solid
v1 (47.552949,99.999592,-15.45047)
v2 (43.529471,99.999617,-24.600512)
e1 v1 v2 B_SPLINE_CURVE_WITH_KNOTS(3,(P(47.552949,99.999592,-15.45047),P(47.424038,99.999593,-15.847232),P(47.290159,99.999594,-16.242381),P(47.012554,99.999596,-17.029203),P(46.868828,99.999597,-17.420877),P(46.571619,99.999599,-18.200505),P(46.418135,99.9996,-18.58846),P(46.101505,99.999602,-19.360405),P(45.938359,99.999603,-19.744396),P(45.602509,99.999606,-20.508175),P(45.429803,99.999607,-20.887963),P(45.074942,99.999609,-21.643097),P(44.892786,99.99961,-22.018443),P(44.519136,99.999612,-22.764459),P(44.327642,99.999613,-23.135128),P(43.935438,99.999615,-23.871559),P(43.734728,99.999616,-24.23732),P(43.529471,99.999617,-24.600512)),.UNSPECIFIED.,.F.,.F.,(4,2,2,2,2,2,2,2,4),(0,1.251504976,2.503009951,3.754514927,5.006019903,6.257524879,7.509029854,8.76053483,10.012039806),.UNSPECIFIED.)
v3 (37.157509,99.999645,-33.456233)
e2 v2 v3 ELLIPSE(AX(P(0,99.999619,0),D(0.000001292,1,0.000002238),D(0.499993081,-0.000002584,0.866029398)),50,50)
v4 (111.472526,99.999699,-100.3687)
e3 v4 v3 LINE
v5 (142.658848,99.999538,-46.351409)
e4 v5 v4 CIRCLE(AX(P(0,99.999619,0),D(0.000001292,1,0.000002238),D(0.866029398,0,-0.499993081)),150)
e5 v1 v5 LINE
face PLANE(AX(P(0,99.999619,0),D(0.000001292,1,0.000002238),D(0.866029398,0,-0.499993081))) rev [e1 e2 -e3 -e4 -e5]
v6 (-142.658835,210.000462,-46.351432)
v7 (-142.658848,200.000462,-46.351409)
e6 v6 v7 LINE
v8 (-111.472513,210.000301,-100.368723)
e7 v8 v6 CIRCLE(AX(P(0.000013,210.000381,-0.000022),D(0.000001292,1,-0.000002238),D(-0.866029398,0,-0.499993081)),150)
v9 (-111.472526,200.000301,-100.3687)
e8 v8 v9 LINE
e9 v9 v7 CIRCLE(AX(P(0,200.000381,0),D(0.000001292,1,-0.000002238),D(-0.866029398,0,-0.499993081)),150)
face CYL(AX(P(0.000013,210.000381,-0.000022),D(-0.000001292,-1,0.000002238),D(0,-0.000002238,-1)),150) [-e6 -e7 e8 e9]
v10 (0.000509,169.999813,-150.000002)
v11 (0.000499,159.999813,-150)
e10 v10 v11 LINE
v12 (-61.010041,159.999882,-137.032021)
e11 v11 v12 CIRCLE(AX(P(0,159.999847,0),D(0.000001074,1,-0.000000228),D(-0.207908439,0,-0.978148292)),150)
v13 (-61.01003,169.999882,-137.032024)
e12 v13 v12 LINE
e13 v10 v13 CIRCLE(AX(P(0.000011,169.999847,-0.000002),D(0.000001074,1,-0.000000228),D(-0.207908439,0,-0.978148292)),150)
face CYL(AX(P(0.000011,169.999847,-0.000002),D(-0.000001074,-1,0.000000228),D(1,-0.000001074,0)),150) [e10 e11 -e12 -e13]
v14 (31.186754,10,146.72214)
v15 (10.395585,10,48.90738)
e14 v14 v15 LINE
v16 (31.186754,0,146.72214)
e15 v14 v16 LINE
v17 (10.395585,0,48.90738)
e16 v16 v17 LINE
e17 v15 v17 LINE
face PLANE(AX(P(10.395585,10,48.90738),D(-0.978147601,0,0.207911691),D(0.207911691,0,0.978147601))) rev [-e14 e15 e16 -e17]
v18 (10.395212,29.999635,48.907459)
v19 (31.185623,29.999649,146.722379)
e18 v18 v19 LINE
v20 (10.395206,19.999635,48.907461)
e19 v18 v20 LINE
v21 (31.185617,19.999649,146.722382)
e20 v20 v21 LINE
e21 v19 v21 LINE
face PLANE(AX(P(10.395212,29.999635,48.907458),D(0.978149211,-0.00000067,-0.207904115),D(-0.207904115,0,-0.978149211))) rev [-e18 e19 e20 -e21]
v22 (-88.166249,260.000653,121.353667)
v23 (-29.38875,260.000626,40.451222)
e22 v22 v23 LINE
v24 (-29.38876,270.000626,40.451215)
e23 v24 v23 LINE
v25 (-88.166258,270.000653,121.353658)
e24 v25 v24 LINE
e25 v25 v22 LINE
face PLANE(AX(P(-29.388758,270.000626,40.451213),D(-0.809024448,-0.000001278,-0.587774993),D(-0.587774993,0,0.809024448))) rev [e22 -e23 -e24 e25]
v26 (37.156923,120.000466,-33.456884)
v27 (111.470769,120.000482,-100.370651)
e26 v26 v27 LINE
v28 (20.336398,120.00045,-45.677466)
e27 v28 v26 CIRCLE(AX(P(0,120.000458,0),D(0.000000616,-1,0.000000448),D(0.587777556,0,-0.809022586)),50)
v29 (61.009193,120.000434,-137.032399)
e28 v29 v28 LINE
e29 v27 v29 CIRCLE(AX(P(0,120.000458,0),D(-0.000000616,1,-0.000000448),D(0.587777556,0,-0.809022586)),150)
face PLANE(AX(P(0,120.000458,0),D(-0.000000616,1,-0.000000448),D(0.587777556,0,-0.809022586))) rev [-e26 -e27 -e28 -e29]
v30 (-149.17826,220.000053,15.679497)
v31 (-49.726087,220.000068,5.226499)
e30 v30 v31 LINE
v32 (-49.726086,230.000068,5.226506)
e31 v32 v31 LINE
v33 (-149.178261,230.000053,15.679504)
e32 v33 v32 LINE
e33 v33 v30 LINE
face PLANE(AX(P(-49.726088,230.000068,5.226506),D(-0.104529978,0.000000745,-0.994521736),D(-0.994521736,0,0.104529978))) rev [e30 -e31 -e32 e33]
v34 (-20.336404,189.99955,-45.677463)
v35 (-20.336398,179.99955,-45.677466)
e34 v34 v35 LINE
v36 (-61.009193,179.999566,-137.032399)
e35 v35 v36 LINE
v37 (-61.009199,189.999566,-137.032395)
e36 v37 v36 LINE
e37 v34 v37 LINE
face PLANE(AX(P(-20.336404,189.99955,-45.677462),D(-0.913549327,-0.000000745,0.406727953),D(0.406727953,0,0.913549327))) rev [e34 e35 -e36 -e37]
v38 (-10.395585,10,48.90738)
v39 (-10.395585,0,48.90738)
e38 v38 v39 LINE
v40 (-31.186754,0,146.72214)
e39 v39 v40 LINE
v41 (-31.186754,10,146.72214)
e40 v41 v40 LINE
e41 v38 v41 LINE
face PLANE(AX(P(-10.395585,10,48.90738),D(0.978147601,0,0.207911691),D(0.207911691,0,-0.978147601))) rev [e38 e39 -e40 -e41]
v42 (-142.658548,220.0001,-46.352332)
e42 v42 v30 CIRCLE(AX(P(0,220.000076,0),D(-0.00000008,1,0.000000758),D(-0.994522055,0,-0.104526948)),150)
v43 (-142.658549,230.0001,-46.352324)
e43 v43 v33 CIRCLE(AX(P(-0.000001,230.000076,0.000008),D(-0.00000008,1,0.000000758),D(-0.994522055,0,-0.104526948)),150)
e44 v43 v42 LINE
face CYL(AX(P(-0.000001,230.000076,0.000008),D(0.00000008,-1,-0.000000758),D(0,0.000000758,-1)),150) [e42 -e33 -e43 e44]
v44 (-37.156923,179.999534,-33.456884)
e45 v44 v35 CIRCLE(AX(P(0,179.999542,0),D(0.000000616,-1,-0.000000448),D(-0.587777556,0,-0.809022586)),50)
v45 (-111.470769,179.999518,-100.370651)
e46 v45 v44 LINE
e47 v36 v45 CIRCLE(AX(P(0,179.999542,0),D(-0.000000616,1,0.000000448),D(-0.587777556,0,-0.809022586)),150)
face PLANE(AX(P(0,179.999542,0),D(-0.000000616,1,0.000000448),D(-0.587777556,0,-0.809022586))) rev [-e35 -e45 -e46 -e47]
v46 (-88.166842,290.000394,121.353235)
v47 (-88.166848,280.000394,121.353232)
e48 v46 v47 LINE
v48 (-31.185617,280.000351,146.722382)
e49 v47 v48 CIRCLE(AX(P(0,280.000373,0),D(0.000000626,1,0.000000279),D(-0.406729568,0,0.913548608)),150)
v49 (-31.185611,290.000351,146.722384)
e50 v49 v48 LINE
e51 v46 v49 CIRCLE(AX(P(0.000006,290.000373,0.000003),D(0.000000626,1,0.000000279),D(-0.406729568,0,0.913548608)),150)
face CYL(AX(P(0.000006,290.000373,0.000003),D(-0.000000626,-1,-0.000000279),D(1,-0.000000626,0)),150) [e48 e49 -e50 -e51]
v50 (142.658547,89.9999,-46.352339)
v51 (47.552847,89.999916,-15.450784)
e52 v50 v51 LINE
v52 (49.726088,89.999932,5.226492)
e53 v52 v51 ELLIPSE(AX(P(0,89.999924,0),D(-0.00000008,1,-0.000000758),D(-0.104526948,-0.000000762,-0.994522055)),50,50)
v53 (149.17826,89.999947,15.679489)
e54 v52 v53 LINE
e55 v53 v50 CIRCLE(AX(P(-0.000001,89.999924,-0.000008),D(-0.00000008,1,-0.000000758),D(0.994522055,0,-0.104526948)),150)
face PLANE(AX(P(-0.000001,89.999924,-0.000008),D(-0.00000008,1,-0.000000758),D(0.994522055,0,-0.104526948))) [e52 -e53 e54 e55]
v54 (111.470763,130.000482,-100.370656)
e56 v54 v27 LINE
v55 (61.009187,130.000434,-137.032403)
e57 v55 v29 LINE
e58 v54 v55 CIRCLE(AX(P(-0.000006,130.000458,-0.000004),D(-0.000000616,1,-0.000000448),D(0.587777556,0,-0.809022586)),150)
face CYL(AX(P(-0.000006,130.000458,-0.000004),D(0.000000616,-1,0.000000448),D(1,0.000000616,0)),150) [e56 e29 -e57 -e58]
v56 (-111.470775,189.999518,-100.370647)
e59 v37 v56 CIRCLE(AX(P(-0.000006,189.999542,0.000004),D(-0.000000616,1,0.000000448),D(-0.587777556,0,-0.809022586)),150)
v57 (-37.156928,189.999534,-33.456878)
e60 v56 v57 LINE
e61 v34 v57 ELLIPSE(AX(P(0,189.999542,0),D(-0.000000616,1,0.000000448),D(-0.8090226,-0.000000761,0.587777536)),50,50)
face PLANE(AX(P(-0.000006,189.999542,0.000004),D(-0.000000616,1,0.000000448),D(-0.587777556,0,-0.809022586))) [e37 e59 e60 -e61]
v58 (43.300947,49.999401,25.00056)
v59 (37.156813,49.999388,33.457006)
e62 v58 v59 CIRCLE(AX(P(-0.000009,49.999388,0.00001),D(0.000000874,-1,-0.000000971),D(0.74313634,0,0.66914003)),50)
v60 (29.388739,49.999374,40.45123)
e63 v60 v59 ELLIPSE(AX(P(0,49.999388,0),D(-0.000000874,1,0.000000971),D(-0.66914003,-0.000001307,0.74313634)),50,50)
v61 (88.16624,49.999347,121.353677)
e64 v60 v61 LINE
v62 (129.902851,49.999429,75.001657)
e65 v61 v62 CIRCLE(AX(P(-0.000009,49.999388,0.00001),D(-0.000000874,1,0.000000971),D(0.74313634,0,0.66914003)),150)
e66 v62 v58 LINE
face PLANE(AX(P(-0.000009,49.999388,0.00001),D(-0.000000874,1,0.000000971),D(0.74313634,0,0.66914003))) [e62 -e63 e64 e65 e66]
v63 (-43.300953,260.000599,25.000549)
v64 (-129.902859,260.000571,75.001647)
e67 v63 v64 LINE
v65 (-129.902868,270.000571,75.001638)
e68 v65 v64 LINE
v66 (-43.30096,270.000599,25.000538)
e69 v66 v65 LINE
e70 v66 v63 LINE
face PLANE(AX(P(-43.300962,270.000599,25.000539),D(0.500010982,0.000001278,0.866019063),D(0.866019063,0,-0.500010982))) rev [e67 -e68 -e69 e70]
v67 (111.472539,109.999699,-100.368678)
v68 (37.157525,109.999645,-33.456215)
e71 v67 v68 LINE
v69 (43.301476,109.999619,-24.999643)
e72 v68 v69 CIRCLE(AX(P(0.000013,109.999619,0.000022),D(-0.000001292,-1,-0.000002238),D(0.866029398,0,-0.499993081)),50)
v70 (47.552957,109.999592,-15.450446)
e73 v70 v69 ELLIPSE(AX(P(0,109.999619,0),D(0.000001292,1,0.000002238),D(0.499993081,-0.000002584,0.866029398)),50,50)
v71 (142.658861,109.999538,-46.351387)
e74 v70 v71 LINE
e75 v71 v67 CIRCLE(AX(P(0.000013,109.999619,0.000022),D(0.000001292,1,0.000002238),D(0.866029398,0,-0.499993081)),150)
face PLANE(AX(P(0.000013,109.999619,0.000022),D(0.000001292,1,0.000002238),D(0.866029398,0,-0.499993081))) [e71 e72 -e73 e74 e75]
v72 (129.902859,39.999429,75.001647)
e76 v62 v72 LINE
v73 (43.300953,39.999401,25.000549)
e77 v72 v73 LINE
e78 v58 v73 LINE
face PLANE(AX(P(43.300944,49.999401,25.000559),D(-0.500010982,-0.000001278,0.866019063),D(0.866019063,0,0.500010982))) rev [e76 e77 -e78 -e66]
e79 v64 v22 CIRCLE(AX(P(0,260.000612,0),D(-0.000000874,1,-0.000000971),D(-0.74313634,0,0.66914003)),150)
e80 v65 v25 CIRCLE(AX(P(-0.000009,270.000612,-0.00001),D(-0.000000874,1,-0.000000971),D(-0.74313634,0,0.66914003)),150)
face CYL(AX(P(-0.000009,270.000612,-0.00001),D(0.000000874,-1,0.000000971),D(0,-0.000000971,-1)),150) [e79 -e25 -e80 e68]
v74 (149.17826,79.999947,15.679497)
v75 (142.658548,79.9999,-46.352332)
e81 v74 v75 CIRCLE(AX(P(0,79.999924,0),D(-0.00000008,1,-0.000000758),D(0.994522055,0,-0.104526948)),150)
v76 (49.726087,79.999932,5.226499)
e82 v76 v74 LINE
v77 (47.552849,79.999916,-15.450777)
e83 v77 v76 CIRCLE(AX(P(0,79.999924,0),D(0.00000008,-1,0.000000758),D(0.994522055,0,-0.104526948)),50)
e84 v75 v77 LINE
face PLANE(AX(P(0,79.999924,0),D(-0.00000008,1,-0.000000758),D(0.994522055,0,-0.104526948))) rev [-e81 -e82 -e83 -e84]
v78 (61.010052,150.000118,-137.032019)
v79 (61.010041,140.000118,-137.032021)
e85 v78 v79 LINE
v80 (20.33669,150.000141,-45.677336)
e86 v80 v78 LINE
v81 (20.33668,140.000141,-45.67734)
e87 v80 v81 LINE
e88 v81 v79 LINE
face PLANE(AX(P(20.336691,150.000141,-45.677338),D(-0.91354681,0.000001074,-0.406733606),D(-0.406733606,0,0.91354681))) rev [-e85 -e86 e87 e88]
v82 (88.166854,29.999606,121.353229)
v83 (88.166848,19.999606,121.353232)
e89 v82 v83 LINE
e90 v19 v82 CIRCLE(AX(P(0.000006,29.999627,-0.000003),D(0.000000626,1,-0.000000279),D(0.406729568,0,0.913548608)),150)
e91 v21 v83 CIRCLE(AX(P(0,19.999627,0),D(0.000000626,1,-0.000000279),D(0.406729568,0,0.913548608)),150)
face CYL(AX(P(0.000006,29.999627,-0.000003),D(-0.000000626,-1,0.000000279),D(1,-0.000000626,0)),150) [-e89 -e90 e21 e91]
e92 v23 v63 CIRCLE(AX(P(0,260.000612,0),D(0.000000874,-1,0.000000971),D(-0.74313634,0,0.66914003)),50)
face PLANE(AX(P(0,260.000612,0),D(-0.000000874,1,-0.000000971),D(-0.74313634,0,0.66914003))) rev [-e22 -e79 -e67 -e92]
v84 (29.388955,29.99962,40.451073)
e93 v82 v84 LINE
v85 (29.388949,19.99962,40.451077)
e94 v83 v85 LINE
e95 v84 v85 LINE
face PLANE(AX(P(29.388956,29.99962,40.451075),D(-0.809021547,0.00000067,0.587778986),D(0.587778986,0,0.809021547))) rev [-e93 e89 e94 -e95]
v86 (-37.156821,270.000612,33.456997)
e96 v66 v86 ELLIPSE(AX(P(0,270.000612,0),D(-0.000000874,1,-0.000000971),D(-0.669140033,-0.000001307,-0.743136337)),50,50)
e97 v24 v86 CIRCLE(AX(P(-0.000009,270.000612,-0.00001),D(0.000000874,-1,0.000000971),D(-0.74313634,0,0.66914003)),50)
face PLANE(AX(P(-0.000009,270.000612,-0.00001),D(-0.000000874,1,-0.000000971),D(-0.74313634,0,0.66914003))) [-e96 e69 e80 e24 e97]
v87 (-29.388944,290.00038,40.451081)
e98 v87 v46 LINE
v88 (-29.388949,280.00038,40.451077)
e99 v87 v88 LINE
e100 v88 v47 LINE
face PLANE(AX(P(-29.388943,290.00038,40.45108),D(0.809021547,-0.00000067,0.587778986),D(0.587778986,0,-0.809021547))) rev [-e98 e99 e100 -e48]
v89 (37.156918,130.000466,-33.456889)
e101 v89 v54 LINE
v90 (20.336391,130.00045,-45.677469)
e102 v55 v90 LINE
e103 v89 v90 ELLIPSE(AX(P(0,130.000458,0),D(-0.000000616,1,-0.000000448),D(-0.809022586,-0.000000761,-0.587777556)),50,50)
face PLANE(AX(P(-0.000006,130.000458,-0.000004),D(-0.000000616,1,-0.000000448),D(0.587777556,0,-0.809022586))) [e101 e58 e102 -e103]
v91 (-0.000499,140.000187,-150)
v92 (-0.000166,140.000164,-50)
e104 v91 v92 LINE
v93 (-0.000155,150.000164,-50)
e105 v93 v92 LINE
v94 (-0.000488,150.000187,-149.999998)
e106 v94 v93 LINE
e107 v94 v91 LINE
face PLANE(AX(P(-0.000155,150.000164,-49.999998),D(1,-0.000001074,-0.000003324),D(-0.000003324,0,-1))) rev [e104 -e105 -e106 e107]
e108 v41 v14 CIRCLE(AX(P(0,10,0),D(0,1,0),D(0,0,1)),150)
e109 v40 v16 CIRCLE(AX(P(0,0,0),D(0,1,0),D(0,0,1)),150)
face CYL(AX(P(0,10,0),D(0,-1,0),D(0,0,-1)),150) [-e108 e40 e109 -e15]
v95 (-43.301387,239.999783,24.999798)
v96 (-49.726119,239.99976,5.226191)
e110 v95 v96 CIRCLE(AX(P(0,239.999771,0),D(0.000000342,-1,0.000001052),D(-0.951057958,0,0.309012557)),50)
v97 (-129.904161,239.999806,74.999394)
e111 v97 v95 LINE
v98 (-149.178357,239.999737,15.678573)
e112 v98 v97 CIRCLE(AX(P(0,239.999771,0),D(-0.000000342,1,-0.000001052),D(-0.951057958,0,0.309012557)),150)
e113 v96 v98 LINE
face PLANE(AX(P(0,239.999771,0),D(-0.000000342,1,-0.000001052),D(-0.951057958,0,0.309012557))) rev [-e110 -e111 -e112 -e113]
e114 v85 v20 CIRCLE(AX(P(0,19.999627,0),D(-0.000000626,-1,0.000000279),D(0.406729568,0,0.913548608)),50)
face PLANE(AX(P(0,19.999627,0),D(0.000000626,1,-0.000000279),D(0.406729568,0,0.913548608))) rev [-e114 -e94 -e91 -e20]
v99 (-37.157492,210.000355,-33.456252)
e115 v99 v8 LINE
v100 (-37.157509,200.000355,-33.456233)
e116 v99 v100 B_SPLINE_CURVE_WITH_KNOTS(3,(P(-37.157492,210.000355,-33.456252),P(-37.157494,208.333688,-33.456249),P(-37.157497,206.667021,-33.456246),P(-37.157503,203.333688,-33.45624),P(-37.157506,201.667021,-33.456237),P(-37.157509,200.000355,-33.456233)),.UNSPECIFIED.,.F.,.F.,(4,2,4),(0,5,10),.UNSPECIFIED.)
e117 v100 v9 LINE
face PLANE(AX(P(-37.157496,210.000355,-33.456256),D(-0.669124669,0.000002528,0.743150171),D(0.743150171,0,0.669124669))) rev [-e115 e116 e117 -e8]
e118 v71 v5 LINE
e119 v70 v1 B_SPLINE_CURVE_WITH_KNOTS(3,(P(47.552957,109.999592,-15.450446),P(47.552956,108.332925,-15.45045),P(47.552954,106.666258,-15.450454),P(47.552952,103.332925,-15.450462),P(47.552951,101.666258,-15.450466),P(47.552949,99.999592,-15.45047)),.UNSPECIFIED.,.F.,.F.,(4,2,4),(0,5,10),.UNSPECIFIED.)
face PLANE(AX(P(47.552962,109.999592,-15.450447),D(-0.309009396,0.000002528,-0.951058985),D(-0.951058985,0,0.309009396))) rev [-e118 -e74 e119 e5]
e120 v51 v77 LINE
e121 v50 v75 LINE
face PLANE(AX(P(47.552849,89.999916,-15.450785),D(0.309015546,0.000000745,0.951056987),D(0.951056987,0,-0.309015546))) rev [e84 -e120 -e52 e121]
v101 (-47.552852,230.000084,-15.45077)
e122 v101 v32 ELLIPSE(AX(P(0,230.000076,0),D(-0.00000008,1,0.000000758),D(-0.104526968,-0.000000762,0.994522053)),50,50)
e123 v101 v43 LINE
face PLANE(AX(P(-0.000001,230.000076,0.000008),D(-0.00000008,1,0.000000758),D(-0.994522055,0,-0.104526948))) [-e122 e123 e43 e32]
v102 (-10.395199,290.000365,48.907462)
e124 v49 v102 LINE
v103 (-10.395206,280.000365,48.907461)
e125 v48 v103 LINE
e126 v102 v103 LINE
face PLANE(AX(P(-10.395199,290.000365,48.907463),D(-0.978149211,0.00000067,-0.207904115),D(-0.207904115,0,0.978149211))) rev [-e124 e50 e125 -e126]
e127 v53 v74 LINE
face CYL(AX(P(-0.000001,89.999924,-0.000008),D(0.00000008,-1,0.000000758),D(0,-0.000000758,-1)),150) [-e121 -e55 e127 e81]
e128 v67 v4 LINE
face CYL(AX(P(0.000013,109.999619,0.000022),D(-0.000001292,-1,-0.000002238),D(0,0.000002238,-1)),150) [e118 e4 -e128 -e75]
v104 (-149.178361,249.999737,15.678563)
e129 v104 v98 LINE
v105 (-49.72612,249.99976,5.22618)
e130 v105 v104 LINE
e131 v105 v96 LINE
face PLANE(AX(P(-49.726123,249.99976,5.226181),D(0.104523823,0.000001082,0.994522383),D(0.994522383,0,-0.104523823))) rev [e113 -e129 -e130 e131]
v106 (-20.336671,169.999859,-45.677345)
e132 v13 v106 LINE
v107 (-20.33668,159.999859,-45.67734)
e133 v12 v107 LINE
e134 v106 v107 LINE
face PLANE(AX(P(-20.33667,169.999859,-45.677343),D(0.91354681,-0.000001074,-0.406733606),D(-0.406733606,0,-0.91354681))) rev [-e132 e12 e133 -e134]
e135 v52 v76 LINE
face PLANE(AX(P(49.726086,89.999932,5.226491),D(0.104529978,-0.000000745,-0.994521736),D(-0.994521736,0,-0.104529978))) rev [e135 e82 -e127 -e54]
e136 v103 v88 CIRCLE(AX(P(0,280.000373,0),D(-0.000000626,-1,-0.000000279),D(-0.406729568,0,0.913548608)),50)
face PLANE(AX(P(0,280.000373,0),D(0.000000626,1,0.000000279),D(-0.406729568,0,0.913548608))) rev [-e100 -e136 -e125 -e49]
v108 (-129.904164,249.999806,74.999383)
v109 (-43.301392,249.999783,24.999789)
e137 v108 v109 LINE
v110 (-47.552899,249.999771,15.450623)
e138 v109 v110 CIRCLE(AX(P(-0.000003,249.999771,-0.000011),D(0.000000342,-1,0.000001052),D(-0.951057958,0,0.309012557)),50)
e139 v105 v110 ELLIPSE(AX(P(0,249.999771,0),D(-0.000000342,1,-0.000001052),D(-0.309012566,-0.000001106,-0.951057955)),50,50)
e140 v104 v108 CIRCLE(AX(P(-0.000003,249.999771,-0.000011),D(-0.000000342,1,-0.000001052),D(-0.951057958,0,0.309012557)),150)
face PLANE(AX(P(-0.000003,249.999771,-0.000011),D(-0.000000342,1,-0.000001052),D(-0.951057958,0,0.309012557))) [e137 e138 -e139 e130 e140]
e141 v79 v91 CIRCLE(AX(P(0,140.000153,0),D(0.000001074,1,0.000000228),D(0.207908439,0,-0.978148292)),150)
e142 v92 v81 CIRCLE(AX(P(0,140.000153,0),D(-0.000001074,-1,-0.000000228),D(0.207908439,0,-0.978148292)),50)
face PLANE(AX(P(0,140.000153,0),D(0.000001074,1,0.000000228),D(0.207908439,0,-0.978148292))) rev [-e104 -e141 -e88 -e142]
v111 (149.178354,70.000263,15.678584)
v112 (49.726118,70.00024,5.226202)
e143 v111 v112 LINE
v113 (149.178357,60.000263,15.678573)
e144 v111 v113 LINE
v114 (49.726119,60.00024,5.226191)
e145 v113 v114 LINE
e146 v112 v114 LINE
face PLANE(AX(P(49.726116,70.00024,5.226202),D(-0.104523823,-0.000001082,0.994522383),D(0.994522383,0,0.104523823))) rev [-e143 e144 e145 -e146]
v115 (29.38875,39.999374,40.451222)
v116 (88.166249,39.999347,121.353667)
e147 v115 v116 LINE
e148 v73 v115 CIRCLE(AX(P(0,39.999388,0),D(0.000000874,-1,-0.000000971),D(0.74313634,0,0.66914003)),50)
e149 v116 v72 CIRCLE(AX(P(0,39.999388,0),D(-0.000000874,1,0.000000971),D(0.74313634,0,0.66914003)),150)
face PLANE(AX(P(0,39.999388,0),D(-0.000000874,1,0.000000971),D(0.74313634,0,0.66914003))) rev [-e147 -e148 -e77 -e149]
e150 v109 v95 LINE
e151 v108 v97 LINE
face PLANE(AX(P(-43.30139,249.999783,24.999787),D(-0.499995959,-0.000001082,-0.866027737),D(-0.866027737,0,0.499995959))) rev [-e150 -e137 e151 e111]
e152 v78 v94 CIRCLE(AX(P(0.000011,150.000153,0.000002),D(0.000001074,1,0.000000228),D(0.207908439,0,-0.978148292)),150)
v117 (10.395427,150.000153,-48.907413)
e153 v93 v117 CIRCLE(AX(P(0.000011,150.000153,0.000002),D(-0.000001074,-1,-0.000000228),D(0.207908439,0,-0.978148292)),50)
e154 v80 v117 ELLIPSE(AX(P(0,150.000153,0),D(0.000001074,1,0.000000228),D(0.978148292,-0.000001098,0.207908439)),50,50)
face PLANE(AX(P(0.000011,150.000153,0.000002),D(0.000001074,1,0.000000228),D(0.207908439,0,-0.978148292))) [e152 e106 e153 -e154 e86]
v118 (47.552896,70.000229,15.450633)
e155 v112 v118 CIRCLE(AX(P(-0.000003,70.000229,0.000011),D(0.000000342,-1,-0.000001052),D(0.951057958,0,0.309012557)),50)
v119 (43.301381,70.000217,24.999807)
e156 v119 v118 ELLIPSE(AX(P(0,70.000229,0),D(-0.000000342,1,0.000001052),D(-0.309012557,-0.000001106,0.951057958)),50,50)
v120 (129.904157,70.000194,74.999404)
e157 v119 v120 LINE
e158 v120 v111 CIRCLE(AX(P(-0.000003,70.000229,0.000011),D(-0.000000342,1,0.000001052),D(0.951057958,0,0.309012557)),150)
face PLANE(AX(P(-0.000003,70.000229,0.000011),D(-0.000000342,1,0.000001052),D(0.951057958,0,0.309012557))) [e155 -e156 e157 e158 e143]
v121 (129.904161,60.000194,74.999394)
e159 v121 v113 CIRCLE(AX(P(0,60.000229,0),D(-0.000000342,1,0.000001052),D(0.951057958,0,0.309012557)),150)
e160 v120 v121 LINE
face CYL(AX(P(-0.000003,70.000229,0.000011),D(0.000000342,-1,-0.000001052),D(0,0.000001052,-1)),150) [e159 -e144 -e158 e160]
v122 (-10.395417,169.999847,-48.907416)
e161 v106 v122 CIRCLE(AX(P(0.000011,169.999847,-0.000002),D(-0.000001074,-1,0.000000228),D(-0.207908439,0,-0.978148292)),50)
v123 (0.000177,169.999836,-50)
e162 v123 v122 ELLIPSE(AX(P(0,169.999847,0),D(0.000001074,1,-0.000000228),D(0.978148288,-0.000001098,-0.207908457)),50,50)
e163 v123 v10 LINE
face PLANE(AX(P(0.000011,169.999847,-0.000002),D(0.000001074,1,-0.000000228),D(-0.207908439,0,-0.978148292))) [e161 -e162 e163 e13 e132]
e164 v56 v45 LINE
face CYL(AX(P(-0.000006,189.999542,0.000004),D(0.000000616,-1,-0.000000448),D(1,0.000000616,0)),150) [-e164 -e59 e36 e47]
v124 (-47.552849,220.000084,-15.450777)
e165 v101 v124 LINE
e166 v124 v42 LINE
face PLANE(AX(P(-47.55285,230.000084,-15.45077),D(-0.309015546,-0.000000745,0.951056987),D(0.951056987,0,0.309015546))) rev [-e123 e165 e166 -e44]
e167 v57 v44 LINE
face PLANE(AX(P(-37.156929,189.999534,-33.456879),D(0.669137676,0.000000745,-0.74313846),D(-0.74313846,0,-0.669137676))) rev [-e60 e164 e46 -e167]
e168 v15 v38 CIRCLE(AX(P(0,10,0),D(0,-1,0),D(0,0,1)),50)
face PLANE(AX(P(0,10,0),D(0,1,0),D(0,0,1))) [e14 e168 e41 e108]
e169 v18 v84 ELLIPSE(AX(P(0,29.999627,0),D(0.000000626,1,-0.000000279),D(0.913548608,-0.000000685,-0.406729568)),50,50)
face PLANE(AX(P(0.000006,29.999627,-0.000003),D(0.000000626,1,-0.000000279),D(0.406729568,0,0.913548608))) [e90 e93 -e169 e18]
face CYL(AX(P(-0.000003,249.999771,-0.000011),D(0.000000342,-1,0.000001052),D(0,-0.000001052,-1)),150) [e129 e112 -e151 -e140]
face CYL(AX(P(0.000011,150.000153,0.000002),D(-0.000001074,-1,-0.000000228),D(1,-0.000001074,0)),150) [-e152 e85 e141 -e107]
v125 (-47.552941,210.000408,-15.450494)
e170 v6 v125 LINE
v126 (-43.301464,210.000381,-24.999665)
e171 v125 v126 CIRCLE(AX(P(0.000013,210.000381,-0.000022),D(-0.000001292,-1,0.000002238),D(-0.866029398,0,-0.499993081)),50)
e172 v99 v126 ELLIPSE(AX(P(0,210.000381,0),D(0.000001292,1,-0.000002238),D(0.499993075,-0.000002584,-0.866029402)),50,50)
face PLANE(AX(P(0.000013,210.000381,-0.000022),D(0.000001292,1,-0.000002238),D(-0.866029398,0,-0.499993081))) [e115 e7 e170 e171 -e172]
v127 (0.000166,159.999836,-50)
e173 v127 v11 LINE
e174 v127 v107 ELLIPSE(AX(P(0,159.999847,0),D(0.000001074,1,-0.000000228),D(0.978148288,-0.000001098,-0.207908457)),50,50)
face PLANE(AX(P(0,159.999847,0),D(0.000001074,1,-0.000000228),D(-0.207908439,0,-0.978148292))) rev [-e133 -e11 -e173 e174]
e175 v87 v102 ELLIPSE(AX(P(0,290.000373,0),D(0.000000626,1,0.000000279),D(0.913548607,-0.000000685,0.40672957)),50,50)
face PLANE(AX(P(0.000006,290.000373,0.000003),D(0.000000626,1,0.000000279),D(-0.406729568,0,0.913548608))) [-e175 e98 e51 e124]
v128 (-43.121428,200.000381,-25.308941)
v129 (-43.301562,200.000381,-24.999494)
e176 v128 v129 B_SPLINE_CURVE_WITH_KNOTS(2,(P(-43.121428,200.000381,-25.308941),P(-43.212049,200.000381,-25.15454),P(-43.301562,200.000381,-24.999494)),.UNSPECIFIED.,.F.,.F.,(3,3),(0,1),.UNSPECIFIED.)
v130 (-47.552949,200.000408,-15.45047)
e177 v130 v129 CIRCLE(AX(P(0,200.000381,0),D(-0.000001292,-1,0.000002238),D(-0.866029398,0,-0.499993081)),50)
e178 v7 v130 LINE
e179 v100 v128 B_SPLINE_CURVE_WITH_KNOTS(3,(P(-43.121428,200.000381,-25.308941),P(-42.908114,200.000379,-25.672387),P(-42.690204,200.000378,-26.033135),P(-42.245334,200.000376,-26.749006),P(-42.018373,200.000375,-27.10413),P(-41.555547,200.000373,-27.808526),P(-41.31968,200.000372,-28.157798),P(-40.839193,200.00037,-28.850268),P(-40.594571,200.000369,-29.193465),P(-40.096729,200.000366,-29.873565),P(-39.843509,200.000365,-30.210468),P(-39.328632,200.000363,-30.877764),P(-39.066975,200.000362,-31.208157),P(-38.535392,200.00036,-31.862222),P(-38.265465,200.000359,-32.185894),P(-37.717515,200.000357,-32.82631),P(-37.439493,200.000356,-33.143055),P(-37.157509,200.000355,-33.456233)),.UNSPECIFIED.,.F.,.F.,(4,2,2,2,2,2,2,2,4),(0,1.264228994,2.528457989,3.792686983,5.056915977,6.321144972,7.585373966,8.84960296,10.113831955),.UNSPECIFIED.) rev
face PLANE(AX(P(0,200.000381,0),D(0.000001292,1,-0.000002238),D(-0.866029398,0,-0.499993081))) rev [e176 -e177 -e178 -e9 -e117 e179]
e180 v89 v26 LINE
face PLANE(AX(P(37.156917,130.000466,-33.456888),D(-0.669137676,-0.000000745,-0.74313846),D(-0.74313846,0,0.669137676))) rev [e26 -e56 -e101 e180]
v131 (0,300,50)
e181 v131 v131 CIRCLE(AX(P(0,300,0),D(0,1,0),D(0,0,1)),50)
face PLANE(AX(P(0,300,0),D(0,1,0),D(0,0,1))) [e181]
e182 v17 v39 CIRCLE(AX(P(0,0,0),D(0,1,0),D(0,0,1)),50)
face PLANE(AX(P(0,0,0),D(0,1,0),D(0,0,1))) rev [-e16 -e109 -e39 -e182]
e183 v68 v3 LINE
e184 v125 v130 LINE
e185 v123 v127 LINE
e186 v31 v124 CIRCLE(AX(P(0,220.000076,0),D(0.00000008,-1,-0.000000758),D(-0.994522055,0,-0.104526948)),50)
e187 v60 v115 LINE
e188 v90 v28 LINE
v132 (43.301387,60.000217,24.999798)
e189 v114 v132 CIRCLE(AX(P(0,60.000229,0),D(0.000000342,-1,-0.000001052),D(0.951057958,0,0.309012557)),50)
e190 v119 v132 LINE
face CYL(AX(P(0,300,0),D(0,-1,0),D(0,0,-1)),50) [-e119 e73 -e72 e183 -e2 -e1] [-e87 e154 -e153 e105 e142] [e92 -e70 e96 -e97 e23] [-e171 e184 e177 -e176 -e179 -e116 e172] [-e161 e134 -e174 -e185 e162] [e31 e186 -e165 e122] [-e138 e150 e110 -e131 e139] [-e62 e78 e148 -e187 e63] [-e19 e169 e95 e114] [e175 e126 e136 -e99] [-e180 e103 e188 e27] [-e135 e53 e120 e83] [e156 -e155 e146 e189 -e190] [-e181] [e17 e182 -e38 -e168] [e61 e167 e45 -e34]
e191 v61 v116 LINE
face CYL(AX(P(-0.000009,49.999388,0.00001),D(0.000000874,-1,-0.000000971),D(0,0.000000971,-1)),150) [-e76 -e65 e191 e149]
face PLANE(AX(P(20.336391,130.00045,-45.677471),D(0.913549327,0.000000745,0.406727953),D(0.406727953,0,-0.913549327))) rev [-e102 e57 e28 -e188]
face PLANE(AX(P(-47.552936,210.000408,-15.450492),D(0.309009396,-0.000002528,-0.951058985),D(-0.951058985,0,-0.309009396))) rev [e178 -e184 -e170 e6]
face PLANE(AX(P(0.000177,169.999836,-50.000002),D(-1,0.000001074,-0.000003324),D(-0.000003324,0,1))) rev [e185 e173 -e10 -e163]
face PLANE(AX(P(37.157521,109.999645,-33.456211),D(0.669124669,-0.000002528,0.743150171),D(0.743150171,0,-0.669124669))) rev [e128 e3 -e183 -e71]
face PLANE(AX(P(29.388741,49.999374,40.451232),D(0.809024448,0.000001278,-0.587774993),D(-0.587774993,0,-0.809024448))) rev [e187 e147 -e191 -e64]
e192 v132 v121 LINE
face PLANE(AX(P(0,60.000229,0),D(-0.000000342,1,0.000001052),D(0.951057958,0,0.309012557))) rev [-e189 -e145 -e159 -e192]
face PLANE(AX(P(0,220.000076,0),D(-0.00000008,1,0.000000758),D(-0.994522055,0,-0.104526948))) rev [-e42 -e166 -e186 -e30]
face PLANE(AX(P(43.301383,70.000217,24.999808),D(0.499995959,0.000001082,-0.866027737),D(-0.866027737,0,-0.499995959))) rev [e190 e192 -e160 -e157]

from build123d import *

# Parameters (mm, degrees)
SKETCH_1_R      = 50
EXTRUDE_1_DEPTH = 300
EXTRUDE_2_DEPTH = 10


with BuildPart() as part:
    # 草圖1 → 填料-伸長1 (new body)
    with BuildSketch(Plane(origin=(0, 0, 0), x_dir=(1, 0, 0), z_dir=(0, 1, 0))):
        with Locations(Location((0, 0, 0), (0, 0, 270))):
            Circle(SKETCH_1_R)
    extrude(amount=EXTRUDE_1_DEPTH)

    # 草圖7 → 填料-伸長2 (add)
    with BuildSketch(Plane(origin=(0, 0, 0), x_dir=(1, 0, 0), z_dir=(0, 1, 0))):
        with BuildLine():
            Line((-10.395584541, -48.907380037), (-31.186753623, -146.72214011))
            ThreePointArc((-31.186753623, -146.72214011), (0, -150), (31.186753623, -146.72214011))
            Line((31.186753623, -146.72214011), (10.395584541, -48.907380037))
            ThreePointArc((10.395584541, -48.907380037), (0, -50), (-10.395584541, -48.907380037))
        make_face()
    extrude(amount=EXTRUDE_2_DEPTH)

    # 曲線導出複製排列1: read off the stored shape, not the designer's step
    # 曲線導出複製排列1: loft between two sections, ruled curve by curve
    pattern_curve_1_from = [
        Edge.make_three_point_arc((88.166854209, 29.999606099, 121.353229236), (61.00944139, 29.999627457, 137.03228839), (31.185623499, 29.999648814, 146.722378865)),
        Edge.make_line((31.185623499, 29.999648814, 146.722378865), (10.3952123, 29.999634576, 48.907459157)),
        Edge.make_line((29.388954737, 29.999620338, 40.451073403), (88.166854209, 29.999606099, 121.353229236)),
        Edge.make_line((29.388954737, 29.999620338, 40.451073403), (10.3952123, 29.999634576, 48.907459157)),
    ]
    pattern_curve_1_to = [
        Edge.make_three_point_arc((88.166847953, 19.999606099, 121.353232022), (61.009435133, 19.999627457, 137.032291175), (31.185617243, 19.999648814, 146.72238165)),
        Edge.make_line((31.185617243, 19.999648814, 146.72238165), (10.395205748, 19.999634576, 48.90746055)),
        Edge.make_line((29.388949318, 19.999620338, 40.451077341), (88.166847953, 19.999606099, 121.353232022)),
        Edge.make_line((29.388949318, 19.999620338, 40.451077341), (10.395205748, 19.999634576, 48.90746055)),
    ]
    pattern_curve_1 = Solid(Shell([*[Face.make_surface_from_curves(pattern_curve_1_from[k], pattern_curve_1_to[k]) for k in range(4)], Face(Wire(pattern_curve_1_from)), Face(Wire(pattern_curve_1_to))]))
    add(pattern_curve_1)

    # Pattern Curve 1 2: loft between two sections, ruled curve by curve
    pattern_curve_1_2_from = [
        Edge.make_three_point_arc((129.902850728, 49.999428516, 75.001657031), (111.470442269, 49.999387758, 100.371014244), (88.166240206, 49.999347, 121.353676925)),
        Edge.make_line((88.166240206, 49.999347, 121.353676925), (29.388739308, 49.999374172, 40.451229918)),
        Edge.make_line((43.300946766, 49.999401344, 25.000560177), (129.902850728, 49.999428516, 75.001657031)),
        Edge.make_line((43.300946766, 49.999401344, 25.000560177), (29.388739308, 49.999374172, 40.451229918)),
    ]
    pattern_curve_1_2_to = [
        Edge.make_three_point_arc((129.902859473, 39.999428516, 75.001647319), (111.470451014, 39.999387758, 100.371004532), (88.166248951, 39.999347, 121.353667213)),
        Edge.make_line((88.166248951, 39.999347, 121.353667213), (29.38874965, 39.999374172, 40.451222404)),
        Edge.make_line((43.300953158, 39.999401344, 25.000549106), (129.902859473, 39.999428516, 75.001647319)),
        Edge.make_line((43.300953158, 39.999401344, 25.000549106), (29.38874965, 39.999374172, 40.451222404)),
    ]
    pattern_curve_1_2 = Solid(Shell([*[Face.make_surface_from_curves(pattern_curve_1_2_from[k], pattern_curve_1_2_to[k]) for k in range(4)], Face(Wire(pattern_curve_1_2_from)), Face(Wire(pattern_curve_1_2_to))]))
    add(pattern_curve_1_2)

    # Pattern Curve 1 3: loft between two sections, ruled curve by curve
    pattern_curve_1_3_from = [
        Edge.make_three_point_arc((149.178354042, 70.000263463, 15.678583971), (142.658690297, 70.000228957, 46.351894057), (129.904157085, 70.00019445, 74.999404412)),
        Edge.make_line((129.904157085, 70.00019445, 74.999404412), (43.301381423, 70.000217454, 24.999807336)),
        Edge.make_line((49.726118022, 70.000240459, 5.226201913), (149.178354042, 70.000263463, 15.678583971)),
        Edge.make_line((49.726118022, 70.000240459, 5.226201913), (43.301381423, 70.000217454, 24.999807336)),
    ]
    pattern_curve_1_3_to = [
        Edge.make_three_point_arc((149.178357461, 60.000263463, 15.678573448), (142.658693716, 60.000228957, 46.351883534), (129.904160504, 60.00019445, 74.999393888)),
        Edge.make_line((129.904160504, 60.00019445, 74.999393888), (43.301386835, 60.000217454, 24.999797963)),
        Edge.make_line((49.726119154, 60.000240459, 5.226191149), (149.178357461, 60.000263463, 15.678573448)),
        Edge.make_line((49.726119154, 60.000240459, 5.226191149), (43.301386835, 60.000217454, 24.999797963)),
    ]
    pattern_curve_1_3 = Solid(Shell([*[Face.make_surface_from_curves(pattern_curve_1_3_from[k], pattern_curve_1_3_to[k]) for k in range(4)], Face(Wire(pattern_curve_1_3_from)), Face(Wire(pattern_curve_1_3_to))]))
    add(pattern_curve_1_3)

    # Pattern Curve 1 4: loft between two sections, ruled curve by curve
    pattern_curve_1_4_from = [
        Edge.make_three_point_arc((142.658547258, 89.999899948, -46.352339417), (149.178307393, 89.999923711, -15.679049819), (149.178259624, 89.999947474, 15.679489161)),
        Edge.make_line((149.178259624, 89.999947474, 15.679489161), (49.726087586, 89.999931632, 5.226491501)),
        Edge.make_line((47.552847048, 89.99991579, -15.450784368), (142.658547258, 89.999899948, -46.352339417)),
        Edge.make_line((47.552847048, 89.99991579, -15.450784368), (49.726087586, 89.999931632, 5.226491501)),
    ]
    pattern_curve_1_4_to = [
        Edge.make_three_point_arc((142.658548055, 79.999899948, -46.35233184), (149.17830819, 79.999923711, -15.679042242), (149.17826042, 79.999947474, 15.679496739)),
        Edge.make_line((149.17826042, 79.999947474, 15.679496739), (49.726086807, 79.999931632, 5.226498913)),
        Edge.make_line((47.552849352, 79.99991579, -15.45077728), (142.658548055, 79.999899948, -46.35233184)),
        Edge.make_line((47.552849352, 79.99991579, -15.45077728), (49.726086807, 79.999931632, 5.226498913)),
    ]
    pattern_curve_1_4 = Solid(Shell([*[Face.make_surface_from_curves(pattern_curve_1_4_from[k], pattern_curve_1_4_to[k]) for k in range(4)], Face(Wire(pattern_curve_1_4_from)), Face(Wire(pattern_curve_1_4_to))]))
    add(pattern_curve_1_4)

    # Pattern Curve 1 5: loft between two sections, ruled curve by curve
    pattern_curve_1_5_from = [
        Edge.make_three_point_arc((111.472538635, 109.99969912, -100.368677975), (129.904422692, 109.99961853, -74.99893976), (142.658860691, 109.99953794, -46.351387014)),
        Edge.make_line((142.658860691, 109.99953794, -46.351387014), (47.552957068, 109.999591667, -15.450445758)),
        Edge.make_line((37.157525485, 109.999645394, -33.456214667), (111.472538635, 109.99969912, -100.368677975)),
        Edge.make_line((37.157525485, 109.999645394, -33.456214667), (47.552957068, 109.999591667, -15.450445758)),
    ]
    pattern_curve_1_5_to = [
        Edge.make_three_point_arc((111.472525715, 99.99969912, -100.368700354), (129.904409772, 99.99961853, -74.998962139), (142.658847771, 99.99953794, -46.351409393)),
        Edge.make_line((142.658847771, 99.99953794, -46.351409393), (47.552949257, 99.999591667, -15.450469798)),
        Edge.make_line((37.157508572, 99.999645394, -33.456233451), (111.472525715, 99.99969912, -100.368700354)),
        Edge.make_line((37.157508572, 99.999645394, -33.456233451), (47.552949257, 99.999591667, -15.450469798)),
    ]
    pattern_curve_1_5 = Solid(Shell([*[Face.make_surface_from_curves(pattern_curve_1_5_from[k], pattern_curve_1_5_to[k]) for k in range(4)], Face(Wire(pattern_curve_1_5_from)), Face(Wire(pattern_curve_1_5_to))]))
    add(pattern_curve_1_5)

    # Pattern Curve 1 6: loft between two sections, ruled curve by curve
    pattern_curve_1_6_from = [
        Edge.make_three_point_arc((61.009186737, 130.000434016, -137.032403499), (88.166627272, 130.000457764, -121.353392352), (111.470762857, 130.000481511, -100.370655837)),
        Edge.make_line((111.470762857, 130.000481511, -100.370655837), (37.156918022, 130.000465679, -33.456889322)),
        Edge.make_line((20.336390828, 130.000449848, -45.67746937), (61.009186737, 130.000434016, -137.032403499)),
        Edge.make_line((20.336390828, 130.000449848, -45.67746937), (37.156918022, 130.000465679, -33.456889322)),
    ]
    pattern_curve_1_6_to = [
        Edge.make_three_point_arc((61.009192897, 120.000434016, -137.032399023), (88.166633433, 120.000457764, -121.353387877), (111.470769017, 120.000481511, -100.370651362)),
        Edge.make_line((111.470769017, 120.000481511, -100.370651362), (37.156923006, 120.00046568, -33.456883787)),
        Edge.make_line((20.336397632, 120.000449848, -45.677466341), (61.009192897, 120.000434016, -137.032399023)),
        Edge.make_line((20.336397632, 120.000449848, -45.677466341), (37.156923006, 120.00046568, -33.456883787)),
    ]
    pattern_curve_1_6 = Solid(Shell([*[Face.make_surface_from_curves(pattern_curve_1_6_from[k], pattern_curve_1_6_to[k]) for k in range(4)], Face(Wire(pattern_curve_1_6_from)), Face(Wire(pattern_curve_1_6_to))]))
    add(pattern_curve_1_6)

    # Pattern Curve 1 7: loft between two sections, ruled curve by curve
    pattern_curve_1_7_from = [
        Edge.make_three_point_arc((-0.000487877, 150.00018683, -149.999997716), (31.186276641, 150.000152588, -146.722241495), (61.010051692, 150.000118346, -137.032019169)),
        Edge.make_line((61.010051692, 150.000118346, -137.032019169), (20.336690129, 150.000141174, -45.677336116)),
        Edge.make_line((-0.000155466, 150.000164002, -50), (-0.000487877, 150.00018683, -149.999997716)),
        Edge.make_line((-0.000155466, 150.000164002, -50), (20.336690129, 150.000141174, -45.677336116)),
    ]
    pattern_curve_1_7_to = [
        Edge.make_three_point_arc((-0.000498617, 140.00018683, -149.999999999), (31.186265902, 140.000152588, -146.722243778), (61.010040952, 140.000118346, -137.032021451)),
        Edge.make_line((61.010040952, 140.000118346, -137.032021451), (20.336680317, 140.000141174, -45.677340484)),
        Edge.make_line((-0.000166206, 140.000164002, -50), (-0.000498617, 140.00018683, -149.999999999)),
        Edge.make_line((-0.000166206, 140.000164002, -50), (20.336680317, 140.000141174, -45.677340484)),
    ]
    pattern_curve_1_7 = Solid(Shell([*[Face.make_surface_from_curves(pattern_curve_1_7_from[k], pattern_curve_1_7_to[k]) for k in range(4)], Face(Wire(pattern_curve_1_7_from)), Face(Wire(pattern_curve_1_7_to))]))
    add(pattern_curve_1_7)

    # Pattern Curve 1 8: loft between two sections, ruled curve by curve
    pattern_curve_1_8_from = [
        Edge.make_three_point_arc((-61.010030212, 169.999881654, -137.032023734), (-31.186255162, 169.999847412, -146.72224606), (0.000509357, 169.99981317, -150.000002282)),
        Edge.make_line((0.000509357, 169.99981317, -150.000002282), (0.000176945, 169.999835998, -50)),
        Edge.make_line((-20.336670506, 169.999858826, -45.677344852), (-61.010030212, 169.999881654, -137.032023734)),
        Edge.make_line((-20.336670506, 169.999858826, -45.677344852), (0.000176945, 169.999835998, -50)),
    ]
    pattern_curve_1_8_to = [
        Edge.make_three_point_arc((-61.010040952, 159.999881654, -137.032021451), (-31.186265902, 159.999847412, -146.722243778), (0.000498617, 159.99981317, -149.999999999)),
        Edge.make_line((0.000498617, 159.99981317, -149.999999999), (0.000166206, 159.999835998, -50)),
        Edge.make_line((-20.336680317, 159.999858826, -45.677340484), (-61.010040952, 159.999881654, -137.032021451)),
        Edge.make_line((-20.336680317, 159.999858826, -45.677340484), (0.000166206, 159.999835998, -50)),
    ]
    pattern_curve_1_8 = Solid(Shell([*[Face.make_surface_from_curves(pattern_curve_1_8_from[k], pattern_curve_1_8_to[k]) for k in range(4)], Face(Wire(pattern_curve_1_8_from)), Face(Wire(pattern_curve_1_8_to))]))
    add(pattern_curve_1_8)

    # Pattern Curve 1 9: loft between two sections, ruled curve by curve
    pattern_curve_1_9_from = [
        Edge.make_three_point_arc((-111.470775177, 189.999518489, -100.370646886), (-88.166639593, 189.999542236, -121.353383401), (-61.009199058, 189.999565984, -137.032394547)),
        Edge.make_line((-61.009199058, 189.999565984, -137.032394547), (-20.336404437, 189.999550152, -45.677463312)),
        Edge.make_line((-37.15692799, 189.99953432, -33.456878252), (-111.470775177, 189.999518489, -100.370646886)),
        Edge.make_line((-37.15692799, 189.99953432, -33.456878252), (-20.336404437, 189.999550152, -45.677463312)),
    ]
    pattern_curve_1_9_to = [
        Edge.make_three_point_arc((-111.470769017, 179.999518489, -100.370651362), (-88.166633433, 179.999542236, -121.353387877), (-61.009192897, 179.999565984, -137.032399023)),
        Edge.make_line((-61.009192897, 179.999565984, -137.032399023), (-20.336397632, 179.999550152, -45.677466341)),
        Edge.make_line((-37.156923006, 179.99953432, -33.456883787), (-111.470769017, 179.999518489, -100.370651362)),
        Edge.make_line((-37.156923006, 179.99953432, -33.456883787), (-20.336397632, 179.999550152, -45.677466341)),
    ]
    pattern_curve_1_9 = Solid(Shell([*[Face.make_surface_from_curves(pattern_curve_1_9_from[k], pattern_curve_1_9_to[k]) for k in range(4)], Face(Wire(pattern_curve_1_9_from)), Face(Wire(pattern_curve_1_9_to))]))
    add(pattern_curve_1_9)

    # Pattern Curve 1 10: loft between two sections, ruled curve by curve
    pattern_curve_1_10_from = [
        Edge.make_three_point_arc((-142.65883485, 210.000462059, -46.351431772), (-129.904396851, 210.00038147, -74.998984518), (-111.472512795, 210.00030088, -100.368722733)),
        Edge.make_line((-111.472512795, 210.00030088, -100.368722733), (-37.157491659, 210.000354606, -33.456252235)),
        Edge.make_line((-47.552941446, 210.000408333, -15.450493837), (-142.65883485, 210.000462059, -46.351431772)),
        Edge.make_line((-47.552941446, 210.000408333, -15.450493837), (-37.157491659, 210.000354606, -33.456252235)),
    ]
    pattern_curve_1_10_to = [
        Edge.make_three_point_arc((-142.658847771, 200.00046206, -46.351409393), (-129.904409772, 200.00038147, -74.998962139), (-111.472525715, 200.00030088, -100.368700354)),
        Edge.make_line((-111.472525715, 200.00030088, -100.368700354), (-37.157508572, 200.000354606, -33.456233451)),
        Edge.make_line((-47.552949257, 200.000408333, -15.450469798), (-142.658847771, 200.00046206, -46.351409393)),
        Edge.make_line((-47.552949257, 200.000408333, -15.450469798), (-37.157508572, 200.000354606, -33.456233451)),
    ]
    pattern_curve_1_10 = Solid(Shell([*[Face.make_surface_from_curves(pattern_curve_1_10_from[k], pattern_curve_1_10_to[k]) for k in range(4)], Face(Wire(pattern_curve_1_10_from)), Face(Wire(pattern_curve_1_10_to))]))
    add(pattern_curve_1_10)

    # Pattern Curve 1 11: loft between two sections, ruled curve by curve
    pattern_curve_1_11_from = [
        Edge.make_three_point_arc((-149.178261217, 230.000052526, 15.679504316), (-149.178308986, 230.000076289, -15.679034664), (-142.658548851, 230.000100052, -46.352324262)),
        Edge.make_line((-142.658548851, 230.000100052, -46.352324262), (-47.552851655, 230.00008421, -15.450770192)),
        Edge.make_line((-49.726086028, 230.000068368, 5.226506325), (-149.178261217, 230.000052526, 15.679504316)),
        Edge.make_line((-49.726086028, 230.000068368, 5.226506325), (-47.552851655, 230.00008421, -15.450770192)),
    ]
    pattern_curve_1_11_to = [
        Edge.make_three_point_arc((-149.17826042, 220.000052526, 15.679496739), (-149.17830819, 220.000076289, -15.679042242), (-142.658548055, 220.000100052, -46.35233184)),
        Edge.make_line((-142.658548055, 220.000100052, -46.35233184), (-47.552849352, 220.00008421, -15.45077728)),
        Edge.make_line((-49.726086807, 220.000068368, 5.226498913), (-149.17826042, 220.000052526, 15.679496739)),
        Edge.make_line((-49.726086807, 220.000068368, 5.226498913), (-47.552849352, 220.00008421, -15.45077728)),
    ]
    pattern_curve_1_11 = Solid(Shell([*[Face.make_surface_from_curves(pattern_curve_1_11_from[k], pattern_curve_1_11_to[k]) for k in range(4)], Face(Wire(pattern_curve_1_11_from)), Face(Wire(pattern_curve_1_11_to))]))
    add(pattern_curve_1_11)

    # Pattern Curve 1 12: loft between two sections, ruled curve by curve
    pattern_curve_1_12_from = [
        Edge.make_three_point_arc((-129.904163923, 249.99980555, 74.999383365), (-142.658697135, 249.999771043, 46.351873011), (-149.17836088, 249.999736537, 15.678562925)),
        Edge.make_line((-149.17836088, 249.999736537, 15.678562925), (-49.726120285, 249.999759541, 5.226180386)),
        Edge.make_line((-43.301392246, 249.999782546, 24.99978859), (-129.904163923, 249.99980555, 74.999383365)),
        Edge.make_line((-43.301392246, 249.999782546, 24.99978859), (-49.726120285, 249.999759541, 5.226180386)),
    ]
    pattern_curve_1_12_to = [
        Edge.make_three_point_arc((-129.904160504, 239.99980555, 74.999393888), (-142.658693716, 239.999771043, 46.351883534), (-149.178357461, 239.999736537, 15.678573448)),
        Edge.make_line((-149.178357461, 239.999736537, 15.678573448), (-49.726119154, 239.999759541, 5.226191149)),
        Edge.make_line((-43.301386835, 239.999782546, 24.999797963), (-129.904160504, 239.99980555, 74.999393888)),
        Edge.make_line((-43.301386835, 239.999782546, 24.999797963), (-49.726119154, 239.999759541, 5.226191149)),
    ]
    pattern_curve_1_12 = Solid(Shell([*[Face.make_surface_from_curves(pattern_curve_1_12_from[k], pattern_curve_1_12_to[k]) for k in range(4)], Face(Wire(pattern_curve_1_12_from)), Face(Wire(pattern_curve_1_12_to))]))
    add(pattern_curve_1_12)

    # Pattern Curve 1 13: loft between two sections, ruled curve by curve
    pattern_curve_1_13_from = [
        Edge.make_three_point_arc((-88.166257696, 270.000653, 121.3536575), (-111.470459759, 270.000612242, 100.37099482), (-129.902868218, 270.000571484, 75.001637607)),
        Edge.make_line((-129.902868218, 270.000571484, 75.001637607), (-43.30095955, 270.000598656, 25.000538036)),
        Edge.make_line((-29.388759992, 270.000625828, 40.45121489), (-88.166257696, 270.000653, 121.3536575)),
        Edge.make_line((-29.388759992, 270.000625828, 40.45121489), (-43.30095955, 270.000598656, 25.000538036)),
    ]
    pattern_curve_1_13_to = [
        Edge.make_three_point_arc((-88.166248951, 260.000653, 121.353667213), (-111.470451014, 260.000612242, 100.371004532), (-129.902859473, 260.000571484, 75.001647319)),
        Edge.make_line((-129.902859473, 260.000571484, 75.001647319), (-43.300953158, 260.000598656, 25.000549106)),
        Edge.make_line((-29.38874965, 260.000625828, 40.451222404), (-88.166248951, 260.000653, 121.353667213)),
        Edge.make_line((-29.38874965, 260.000625828, 40.451222404), (-43.300953158, 260.000598656, 25.000549106)),
    ]
    pattern_curve_1_13 = Solid(Shell([*[Face.make_surface_from_curves(pattern_curve_1_13_from[k], pattern_curve_1_13_to[k]) for k in range(4)], Face(Wire(pattern_curve_1_13_from)), Face(Wire(pattern_curve_1_13_to))]))
    add(pattern_curve_1_13)

    # Pattern Curve 1 14: loft between two sections, ruled curve by curve
    pattern_curve_1_14_from = [
        Edge.make_three_point_arc((-31.185610987, 290.000351186, 146.722384436), (-61.009428877, 290.000372543, 137.03229396), (-88.166841697, 290.000393901, 121.353234807)),
        Edge.make_line((-88.166841697, 290.000393901, 121.353234807), (-29.388943898, 290.000379662, 40.451081278)),
        Edge.make_line((-10.395199196, 290.000365424, 48.907461943), (-31.185610987, 290.000351186, 146.722384436)),
        Edge.make_line((-10.395199196, 290.000365424, 48.907461943), (-29.388943898, 290.000379662, 40.451081278)),
    ]
    pattern_curve_1_14_to = [
        Edge.make_three_point_arc((-31.185617243, 280.000351186, 146.72238165), (-61.009435133, 280.000372543, 137.032291175), (-88.166847953, 280.000393901, 121.353232022)),
        Edge.make_line((-88.166847953, 280.000393901, 121.353232022), (-29.388949318, 280.000379662, 40.451077341)),
        Edge.make_line((-10.395205748, 280.000365424, 48.90746055), (-31.185617243, 280.000351186, 146.72238165)),
        Edge.make_line((-10.395205748, 280.000365424, 48.90746055), (-29.388949318, 280.000379662, 40.451077341)),
    ]
    pattern_curve_1_14 = Solid(Shell([*[Face.make_surface_from_curves(pattern_curve_1_14_from[k], pattern_curve_1_14_to[k]) for k in range(4)], Face(Wire(pattern_curve_1_14_from)), Face(Wire(pattern_curve_1_14_to))]))
    add(pattern_curve_1_14)


solid = part.part
